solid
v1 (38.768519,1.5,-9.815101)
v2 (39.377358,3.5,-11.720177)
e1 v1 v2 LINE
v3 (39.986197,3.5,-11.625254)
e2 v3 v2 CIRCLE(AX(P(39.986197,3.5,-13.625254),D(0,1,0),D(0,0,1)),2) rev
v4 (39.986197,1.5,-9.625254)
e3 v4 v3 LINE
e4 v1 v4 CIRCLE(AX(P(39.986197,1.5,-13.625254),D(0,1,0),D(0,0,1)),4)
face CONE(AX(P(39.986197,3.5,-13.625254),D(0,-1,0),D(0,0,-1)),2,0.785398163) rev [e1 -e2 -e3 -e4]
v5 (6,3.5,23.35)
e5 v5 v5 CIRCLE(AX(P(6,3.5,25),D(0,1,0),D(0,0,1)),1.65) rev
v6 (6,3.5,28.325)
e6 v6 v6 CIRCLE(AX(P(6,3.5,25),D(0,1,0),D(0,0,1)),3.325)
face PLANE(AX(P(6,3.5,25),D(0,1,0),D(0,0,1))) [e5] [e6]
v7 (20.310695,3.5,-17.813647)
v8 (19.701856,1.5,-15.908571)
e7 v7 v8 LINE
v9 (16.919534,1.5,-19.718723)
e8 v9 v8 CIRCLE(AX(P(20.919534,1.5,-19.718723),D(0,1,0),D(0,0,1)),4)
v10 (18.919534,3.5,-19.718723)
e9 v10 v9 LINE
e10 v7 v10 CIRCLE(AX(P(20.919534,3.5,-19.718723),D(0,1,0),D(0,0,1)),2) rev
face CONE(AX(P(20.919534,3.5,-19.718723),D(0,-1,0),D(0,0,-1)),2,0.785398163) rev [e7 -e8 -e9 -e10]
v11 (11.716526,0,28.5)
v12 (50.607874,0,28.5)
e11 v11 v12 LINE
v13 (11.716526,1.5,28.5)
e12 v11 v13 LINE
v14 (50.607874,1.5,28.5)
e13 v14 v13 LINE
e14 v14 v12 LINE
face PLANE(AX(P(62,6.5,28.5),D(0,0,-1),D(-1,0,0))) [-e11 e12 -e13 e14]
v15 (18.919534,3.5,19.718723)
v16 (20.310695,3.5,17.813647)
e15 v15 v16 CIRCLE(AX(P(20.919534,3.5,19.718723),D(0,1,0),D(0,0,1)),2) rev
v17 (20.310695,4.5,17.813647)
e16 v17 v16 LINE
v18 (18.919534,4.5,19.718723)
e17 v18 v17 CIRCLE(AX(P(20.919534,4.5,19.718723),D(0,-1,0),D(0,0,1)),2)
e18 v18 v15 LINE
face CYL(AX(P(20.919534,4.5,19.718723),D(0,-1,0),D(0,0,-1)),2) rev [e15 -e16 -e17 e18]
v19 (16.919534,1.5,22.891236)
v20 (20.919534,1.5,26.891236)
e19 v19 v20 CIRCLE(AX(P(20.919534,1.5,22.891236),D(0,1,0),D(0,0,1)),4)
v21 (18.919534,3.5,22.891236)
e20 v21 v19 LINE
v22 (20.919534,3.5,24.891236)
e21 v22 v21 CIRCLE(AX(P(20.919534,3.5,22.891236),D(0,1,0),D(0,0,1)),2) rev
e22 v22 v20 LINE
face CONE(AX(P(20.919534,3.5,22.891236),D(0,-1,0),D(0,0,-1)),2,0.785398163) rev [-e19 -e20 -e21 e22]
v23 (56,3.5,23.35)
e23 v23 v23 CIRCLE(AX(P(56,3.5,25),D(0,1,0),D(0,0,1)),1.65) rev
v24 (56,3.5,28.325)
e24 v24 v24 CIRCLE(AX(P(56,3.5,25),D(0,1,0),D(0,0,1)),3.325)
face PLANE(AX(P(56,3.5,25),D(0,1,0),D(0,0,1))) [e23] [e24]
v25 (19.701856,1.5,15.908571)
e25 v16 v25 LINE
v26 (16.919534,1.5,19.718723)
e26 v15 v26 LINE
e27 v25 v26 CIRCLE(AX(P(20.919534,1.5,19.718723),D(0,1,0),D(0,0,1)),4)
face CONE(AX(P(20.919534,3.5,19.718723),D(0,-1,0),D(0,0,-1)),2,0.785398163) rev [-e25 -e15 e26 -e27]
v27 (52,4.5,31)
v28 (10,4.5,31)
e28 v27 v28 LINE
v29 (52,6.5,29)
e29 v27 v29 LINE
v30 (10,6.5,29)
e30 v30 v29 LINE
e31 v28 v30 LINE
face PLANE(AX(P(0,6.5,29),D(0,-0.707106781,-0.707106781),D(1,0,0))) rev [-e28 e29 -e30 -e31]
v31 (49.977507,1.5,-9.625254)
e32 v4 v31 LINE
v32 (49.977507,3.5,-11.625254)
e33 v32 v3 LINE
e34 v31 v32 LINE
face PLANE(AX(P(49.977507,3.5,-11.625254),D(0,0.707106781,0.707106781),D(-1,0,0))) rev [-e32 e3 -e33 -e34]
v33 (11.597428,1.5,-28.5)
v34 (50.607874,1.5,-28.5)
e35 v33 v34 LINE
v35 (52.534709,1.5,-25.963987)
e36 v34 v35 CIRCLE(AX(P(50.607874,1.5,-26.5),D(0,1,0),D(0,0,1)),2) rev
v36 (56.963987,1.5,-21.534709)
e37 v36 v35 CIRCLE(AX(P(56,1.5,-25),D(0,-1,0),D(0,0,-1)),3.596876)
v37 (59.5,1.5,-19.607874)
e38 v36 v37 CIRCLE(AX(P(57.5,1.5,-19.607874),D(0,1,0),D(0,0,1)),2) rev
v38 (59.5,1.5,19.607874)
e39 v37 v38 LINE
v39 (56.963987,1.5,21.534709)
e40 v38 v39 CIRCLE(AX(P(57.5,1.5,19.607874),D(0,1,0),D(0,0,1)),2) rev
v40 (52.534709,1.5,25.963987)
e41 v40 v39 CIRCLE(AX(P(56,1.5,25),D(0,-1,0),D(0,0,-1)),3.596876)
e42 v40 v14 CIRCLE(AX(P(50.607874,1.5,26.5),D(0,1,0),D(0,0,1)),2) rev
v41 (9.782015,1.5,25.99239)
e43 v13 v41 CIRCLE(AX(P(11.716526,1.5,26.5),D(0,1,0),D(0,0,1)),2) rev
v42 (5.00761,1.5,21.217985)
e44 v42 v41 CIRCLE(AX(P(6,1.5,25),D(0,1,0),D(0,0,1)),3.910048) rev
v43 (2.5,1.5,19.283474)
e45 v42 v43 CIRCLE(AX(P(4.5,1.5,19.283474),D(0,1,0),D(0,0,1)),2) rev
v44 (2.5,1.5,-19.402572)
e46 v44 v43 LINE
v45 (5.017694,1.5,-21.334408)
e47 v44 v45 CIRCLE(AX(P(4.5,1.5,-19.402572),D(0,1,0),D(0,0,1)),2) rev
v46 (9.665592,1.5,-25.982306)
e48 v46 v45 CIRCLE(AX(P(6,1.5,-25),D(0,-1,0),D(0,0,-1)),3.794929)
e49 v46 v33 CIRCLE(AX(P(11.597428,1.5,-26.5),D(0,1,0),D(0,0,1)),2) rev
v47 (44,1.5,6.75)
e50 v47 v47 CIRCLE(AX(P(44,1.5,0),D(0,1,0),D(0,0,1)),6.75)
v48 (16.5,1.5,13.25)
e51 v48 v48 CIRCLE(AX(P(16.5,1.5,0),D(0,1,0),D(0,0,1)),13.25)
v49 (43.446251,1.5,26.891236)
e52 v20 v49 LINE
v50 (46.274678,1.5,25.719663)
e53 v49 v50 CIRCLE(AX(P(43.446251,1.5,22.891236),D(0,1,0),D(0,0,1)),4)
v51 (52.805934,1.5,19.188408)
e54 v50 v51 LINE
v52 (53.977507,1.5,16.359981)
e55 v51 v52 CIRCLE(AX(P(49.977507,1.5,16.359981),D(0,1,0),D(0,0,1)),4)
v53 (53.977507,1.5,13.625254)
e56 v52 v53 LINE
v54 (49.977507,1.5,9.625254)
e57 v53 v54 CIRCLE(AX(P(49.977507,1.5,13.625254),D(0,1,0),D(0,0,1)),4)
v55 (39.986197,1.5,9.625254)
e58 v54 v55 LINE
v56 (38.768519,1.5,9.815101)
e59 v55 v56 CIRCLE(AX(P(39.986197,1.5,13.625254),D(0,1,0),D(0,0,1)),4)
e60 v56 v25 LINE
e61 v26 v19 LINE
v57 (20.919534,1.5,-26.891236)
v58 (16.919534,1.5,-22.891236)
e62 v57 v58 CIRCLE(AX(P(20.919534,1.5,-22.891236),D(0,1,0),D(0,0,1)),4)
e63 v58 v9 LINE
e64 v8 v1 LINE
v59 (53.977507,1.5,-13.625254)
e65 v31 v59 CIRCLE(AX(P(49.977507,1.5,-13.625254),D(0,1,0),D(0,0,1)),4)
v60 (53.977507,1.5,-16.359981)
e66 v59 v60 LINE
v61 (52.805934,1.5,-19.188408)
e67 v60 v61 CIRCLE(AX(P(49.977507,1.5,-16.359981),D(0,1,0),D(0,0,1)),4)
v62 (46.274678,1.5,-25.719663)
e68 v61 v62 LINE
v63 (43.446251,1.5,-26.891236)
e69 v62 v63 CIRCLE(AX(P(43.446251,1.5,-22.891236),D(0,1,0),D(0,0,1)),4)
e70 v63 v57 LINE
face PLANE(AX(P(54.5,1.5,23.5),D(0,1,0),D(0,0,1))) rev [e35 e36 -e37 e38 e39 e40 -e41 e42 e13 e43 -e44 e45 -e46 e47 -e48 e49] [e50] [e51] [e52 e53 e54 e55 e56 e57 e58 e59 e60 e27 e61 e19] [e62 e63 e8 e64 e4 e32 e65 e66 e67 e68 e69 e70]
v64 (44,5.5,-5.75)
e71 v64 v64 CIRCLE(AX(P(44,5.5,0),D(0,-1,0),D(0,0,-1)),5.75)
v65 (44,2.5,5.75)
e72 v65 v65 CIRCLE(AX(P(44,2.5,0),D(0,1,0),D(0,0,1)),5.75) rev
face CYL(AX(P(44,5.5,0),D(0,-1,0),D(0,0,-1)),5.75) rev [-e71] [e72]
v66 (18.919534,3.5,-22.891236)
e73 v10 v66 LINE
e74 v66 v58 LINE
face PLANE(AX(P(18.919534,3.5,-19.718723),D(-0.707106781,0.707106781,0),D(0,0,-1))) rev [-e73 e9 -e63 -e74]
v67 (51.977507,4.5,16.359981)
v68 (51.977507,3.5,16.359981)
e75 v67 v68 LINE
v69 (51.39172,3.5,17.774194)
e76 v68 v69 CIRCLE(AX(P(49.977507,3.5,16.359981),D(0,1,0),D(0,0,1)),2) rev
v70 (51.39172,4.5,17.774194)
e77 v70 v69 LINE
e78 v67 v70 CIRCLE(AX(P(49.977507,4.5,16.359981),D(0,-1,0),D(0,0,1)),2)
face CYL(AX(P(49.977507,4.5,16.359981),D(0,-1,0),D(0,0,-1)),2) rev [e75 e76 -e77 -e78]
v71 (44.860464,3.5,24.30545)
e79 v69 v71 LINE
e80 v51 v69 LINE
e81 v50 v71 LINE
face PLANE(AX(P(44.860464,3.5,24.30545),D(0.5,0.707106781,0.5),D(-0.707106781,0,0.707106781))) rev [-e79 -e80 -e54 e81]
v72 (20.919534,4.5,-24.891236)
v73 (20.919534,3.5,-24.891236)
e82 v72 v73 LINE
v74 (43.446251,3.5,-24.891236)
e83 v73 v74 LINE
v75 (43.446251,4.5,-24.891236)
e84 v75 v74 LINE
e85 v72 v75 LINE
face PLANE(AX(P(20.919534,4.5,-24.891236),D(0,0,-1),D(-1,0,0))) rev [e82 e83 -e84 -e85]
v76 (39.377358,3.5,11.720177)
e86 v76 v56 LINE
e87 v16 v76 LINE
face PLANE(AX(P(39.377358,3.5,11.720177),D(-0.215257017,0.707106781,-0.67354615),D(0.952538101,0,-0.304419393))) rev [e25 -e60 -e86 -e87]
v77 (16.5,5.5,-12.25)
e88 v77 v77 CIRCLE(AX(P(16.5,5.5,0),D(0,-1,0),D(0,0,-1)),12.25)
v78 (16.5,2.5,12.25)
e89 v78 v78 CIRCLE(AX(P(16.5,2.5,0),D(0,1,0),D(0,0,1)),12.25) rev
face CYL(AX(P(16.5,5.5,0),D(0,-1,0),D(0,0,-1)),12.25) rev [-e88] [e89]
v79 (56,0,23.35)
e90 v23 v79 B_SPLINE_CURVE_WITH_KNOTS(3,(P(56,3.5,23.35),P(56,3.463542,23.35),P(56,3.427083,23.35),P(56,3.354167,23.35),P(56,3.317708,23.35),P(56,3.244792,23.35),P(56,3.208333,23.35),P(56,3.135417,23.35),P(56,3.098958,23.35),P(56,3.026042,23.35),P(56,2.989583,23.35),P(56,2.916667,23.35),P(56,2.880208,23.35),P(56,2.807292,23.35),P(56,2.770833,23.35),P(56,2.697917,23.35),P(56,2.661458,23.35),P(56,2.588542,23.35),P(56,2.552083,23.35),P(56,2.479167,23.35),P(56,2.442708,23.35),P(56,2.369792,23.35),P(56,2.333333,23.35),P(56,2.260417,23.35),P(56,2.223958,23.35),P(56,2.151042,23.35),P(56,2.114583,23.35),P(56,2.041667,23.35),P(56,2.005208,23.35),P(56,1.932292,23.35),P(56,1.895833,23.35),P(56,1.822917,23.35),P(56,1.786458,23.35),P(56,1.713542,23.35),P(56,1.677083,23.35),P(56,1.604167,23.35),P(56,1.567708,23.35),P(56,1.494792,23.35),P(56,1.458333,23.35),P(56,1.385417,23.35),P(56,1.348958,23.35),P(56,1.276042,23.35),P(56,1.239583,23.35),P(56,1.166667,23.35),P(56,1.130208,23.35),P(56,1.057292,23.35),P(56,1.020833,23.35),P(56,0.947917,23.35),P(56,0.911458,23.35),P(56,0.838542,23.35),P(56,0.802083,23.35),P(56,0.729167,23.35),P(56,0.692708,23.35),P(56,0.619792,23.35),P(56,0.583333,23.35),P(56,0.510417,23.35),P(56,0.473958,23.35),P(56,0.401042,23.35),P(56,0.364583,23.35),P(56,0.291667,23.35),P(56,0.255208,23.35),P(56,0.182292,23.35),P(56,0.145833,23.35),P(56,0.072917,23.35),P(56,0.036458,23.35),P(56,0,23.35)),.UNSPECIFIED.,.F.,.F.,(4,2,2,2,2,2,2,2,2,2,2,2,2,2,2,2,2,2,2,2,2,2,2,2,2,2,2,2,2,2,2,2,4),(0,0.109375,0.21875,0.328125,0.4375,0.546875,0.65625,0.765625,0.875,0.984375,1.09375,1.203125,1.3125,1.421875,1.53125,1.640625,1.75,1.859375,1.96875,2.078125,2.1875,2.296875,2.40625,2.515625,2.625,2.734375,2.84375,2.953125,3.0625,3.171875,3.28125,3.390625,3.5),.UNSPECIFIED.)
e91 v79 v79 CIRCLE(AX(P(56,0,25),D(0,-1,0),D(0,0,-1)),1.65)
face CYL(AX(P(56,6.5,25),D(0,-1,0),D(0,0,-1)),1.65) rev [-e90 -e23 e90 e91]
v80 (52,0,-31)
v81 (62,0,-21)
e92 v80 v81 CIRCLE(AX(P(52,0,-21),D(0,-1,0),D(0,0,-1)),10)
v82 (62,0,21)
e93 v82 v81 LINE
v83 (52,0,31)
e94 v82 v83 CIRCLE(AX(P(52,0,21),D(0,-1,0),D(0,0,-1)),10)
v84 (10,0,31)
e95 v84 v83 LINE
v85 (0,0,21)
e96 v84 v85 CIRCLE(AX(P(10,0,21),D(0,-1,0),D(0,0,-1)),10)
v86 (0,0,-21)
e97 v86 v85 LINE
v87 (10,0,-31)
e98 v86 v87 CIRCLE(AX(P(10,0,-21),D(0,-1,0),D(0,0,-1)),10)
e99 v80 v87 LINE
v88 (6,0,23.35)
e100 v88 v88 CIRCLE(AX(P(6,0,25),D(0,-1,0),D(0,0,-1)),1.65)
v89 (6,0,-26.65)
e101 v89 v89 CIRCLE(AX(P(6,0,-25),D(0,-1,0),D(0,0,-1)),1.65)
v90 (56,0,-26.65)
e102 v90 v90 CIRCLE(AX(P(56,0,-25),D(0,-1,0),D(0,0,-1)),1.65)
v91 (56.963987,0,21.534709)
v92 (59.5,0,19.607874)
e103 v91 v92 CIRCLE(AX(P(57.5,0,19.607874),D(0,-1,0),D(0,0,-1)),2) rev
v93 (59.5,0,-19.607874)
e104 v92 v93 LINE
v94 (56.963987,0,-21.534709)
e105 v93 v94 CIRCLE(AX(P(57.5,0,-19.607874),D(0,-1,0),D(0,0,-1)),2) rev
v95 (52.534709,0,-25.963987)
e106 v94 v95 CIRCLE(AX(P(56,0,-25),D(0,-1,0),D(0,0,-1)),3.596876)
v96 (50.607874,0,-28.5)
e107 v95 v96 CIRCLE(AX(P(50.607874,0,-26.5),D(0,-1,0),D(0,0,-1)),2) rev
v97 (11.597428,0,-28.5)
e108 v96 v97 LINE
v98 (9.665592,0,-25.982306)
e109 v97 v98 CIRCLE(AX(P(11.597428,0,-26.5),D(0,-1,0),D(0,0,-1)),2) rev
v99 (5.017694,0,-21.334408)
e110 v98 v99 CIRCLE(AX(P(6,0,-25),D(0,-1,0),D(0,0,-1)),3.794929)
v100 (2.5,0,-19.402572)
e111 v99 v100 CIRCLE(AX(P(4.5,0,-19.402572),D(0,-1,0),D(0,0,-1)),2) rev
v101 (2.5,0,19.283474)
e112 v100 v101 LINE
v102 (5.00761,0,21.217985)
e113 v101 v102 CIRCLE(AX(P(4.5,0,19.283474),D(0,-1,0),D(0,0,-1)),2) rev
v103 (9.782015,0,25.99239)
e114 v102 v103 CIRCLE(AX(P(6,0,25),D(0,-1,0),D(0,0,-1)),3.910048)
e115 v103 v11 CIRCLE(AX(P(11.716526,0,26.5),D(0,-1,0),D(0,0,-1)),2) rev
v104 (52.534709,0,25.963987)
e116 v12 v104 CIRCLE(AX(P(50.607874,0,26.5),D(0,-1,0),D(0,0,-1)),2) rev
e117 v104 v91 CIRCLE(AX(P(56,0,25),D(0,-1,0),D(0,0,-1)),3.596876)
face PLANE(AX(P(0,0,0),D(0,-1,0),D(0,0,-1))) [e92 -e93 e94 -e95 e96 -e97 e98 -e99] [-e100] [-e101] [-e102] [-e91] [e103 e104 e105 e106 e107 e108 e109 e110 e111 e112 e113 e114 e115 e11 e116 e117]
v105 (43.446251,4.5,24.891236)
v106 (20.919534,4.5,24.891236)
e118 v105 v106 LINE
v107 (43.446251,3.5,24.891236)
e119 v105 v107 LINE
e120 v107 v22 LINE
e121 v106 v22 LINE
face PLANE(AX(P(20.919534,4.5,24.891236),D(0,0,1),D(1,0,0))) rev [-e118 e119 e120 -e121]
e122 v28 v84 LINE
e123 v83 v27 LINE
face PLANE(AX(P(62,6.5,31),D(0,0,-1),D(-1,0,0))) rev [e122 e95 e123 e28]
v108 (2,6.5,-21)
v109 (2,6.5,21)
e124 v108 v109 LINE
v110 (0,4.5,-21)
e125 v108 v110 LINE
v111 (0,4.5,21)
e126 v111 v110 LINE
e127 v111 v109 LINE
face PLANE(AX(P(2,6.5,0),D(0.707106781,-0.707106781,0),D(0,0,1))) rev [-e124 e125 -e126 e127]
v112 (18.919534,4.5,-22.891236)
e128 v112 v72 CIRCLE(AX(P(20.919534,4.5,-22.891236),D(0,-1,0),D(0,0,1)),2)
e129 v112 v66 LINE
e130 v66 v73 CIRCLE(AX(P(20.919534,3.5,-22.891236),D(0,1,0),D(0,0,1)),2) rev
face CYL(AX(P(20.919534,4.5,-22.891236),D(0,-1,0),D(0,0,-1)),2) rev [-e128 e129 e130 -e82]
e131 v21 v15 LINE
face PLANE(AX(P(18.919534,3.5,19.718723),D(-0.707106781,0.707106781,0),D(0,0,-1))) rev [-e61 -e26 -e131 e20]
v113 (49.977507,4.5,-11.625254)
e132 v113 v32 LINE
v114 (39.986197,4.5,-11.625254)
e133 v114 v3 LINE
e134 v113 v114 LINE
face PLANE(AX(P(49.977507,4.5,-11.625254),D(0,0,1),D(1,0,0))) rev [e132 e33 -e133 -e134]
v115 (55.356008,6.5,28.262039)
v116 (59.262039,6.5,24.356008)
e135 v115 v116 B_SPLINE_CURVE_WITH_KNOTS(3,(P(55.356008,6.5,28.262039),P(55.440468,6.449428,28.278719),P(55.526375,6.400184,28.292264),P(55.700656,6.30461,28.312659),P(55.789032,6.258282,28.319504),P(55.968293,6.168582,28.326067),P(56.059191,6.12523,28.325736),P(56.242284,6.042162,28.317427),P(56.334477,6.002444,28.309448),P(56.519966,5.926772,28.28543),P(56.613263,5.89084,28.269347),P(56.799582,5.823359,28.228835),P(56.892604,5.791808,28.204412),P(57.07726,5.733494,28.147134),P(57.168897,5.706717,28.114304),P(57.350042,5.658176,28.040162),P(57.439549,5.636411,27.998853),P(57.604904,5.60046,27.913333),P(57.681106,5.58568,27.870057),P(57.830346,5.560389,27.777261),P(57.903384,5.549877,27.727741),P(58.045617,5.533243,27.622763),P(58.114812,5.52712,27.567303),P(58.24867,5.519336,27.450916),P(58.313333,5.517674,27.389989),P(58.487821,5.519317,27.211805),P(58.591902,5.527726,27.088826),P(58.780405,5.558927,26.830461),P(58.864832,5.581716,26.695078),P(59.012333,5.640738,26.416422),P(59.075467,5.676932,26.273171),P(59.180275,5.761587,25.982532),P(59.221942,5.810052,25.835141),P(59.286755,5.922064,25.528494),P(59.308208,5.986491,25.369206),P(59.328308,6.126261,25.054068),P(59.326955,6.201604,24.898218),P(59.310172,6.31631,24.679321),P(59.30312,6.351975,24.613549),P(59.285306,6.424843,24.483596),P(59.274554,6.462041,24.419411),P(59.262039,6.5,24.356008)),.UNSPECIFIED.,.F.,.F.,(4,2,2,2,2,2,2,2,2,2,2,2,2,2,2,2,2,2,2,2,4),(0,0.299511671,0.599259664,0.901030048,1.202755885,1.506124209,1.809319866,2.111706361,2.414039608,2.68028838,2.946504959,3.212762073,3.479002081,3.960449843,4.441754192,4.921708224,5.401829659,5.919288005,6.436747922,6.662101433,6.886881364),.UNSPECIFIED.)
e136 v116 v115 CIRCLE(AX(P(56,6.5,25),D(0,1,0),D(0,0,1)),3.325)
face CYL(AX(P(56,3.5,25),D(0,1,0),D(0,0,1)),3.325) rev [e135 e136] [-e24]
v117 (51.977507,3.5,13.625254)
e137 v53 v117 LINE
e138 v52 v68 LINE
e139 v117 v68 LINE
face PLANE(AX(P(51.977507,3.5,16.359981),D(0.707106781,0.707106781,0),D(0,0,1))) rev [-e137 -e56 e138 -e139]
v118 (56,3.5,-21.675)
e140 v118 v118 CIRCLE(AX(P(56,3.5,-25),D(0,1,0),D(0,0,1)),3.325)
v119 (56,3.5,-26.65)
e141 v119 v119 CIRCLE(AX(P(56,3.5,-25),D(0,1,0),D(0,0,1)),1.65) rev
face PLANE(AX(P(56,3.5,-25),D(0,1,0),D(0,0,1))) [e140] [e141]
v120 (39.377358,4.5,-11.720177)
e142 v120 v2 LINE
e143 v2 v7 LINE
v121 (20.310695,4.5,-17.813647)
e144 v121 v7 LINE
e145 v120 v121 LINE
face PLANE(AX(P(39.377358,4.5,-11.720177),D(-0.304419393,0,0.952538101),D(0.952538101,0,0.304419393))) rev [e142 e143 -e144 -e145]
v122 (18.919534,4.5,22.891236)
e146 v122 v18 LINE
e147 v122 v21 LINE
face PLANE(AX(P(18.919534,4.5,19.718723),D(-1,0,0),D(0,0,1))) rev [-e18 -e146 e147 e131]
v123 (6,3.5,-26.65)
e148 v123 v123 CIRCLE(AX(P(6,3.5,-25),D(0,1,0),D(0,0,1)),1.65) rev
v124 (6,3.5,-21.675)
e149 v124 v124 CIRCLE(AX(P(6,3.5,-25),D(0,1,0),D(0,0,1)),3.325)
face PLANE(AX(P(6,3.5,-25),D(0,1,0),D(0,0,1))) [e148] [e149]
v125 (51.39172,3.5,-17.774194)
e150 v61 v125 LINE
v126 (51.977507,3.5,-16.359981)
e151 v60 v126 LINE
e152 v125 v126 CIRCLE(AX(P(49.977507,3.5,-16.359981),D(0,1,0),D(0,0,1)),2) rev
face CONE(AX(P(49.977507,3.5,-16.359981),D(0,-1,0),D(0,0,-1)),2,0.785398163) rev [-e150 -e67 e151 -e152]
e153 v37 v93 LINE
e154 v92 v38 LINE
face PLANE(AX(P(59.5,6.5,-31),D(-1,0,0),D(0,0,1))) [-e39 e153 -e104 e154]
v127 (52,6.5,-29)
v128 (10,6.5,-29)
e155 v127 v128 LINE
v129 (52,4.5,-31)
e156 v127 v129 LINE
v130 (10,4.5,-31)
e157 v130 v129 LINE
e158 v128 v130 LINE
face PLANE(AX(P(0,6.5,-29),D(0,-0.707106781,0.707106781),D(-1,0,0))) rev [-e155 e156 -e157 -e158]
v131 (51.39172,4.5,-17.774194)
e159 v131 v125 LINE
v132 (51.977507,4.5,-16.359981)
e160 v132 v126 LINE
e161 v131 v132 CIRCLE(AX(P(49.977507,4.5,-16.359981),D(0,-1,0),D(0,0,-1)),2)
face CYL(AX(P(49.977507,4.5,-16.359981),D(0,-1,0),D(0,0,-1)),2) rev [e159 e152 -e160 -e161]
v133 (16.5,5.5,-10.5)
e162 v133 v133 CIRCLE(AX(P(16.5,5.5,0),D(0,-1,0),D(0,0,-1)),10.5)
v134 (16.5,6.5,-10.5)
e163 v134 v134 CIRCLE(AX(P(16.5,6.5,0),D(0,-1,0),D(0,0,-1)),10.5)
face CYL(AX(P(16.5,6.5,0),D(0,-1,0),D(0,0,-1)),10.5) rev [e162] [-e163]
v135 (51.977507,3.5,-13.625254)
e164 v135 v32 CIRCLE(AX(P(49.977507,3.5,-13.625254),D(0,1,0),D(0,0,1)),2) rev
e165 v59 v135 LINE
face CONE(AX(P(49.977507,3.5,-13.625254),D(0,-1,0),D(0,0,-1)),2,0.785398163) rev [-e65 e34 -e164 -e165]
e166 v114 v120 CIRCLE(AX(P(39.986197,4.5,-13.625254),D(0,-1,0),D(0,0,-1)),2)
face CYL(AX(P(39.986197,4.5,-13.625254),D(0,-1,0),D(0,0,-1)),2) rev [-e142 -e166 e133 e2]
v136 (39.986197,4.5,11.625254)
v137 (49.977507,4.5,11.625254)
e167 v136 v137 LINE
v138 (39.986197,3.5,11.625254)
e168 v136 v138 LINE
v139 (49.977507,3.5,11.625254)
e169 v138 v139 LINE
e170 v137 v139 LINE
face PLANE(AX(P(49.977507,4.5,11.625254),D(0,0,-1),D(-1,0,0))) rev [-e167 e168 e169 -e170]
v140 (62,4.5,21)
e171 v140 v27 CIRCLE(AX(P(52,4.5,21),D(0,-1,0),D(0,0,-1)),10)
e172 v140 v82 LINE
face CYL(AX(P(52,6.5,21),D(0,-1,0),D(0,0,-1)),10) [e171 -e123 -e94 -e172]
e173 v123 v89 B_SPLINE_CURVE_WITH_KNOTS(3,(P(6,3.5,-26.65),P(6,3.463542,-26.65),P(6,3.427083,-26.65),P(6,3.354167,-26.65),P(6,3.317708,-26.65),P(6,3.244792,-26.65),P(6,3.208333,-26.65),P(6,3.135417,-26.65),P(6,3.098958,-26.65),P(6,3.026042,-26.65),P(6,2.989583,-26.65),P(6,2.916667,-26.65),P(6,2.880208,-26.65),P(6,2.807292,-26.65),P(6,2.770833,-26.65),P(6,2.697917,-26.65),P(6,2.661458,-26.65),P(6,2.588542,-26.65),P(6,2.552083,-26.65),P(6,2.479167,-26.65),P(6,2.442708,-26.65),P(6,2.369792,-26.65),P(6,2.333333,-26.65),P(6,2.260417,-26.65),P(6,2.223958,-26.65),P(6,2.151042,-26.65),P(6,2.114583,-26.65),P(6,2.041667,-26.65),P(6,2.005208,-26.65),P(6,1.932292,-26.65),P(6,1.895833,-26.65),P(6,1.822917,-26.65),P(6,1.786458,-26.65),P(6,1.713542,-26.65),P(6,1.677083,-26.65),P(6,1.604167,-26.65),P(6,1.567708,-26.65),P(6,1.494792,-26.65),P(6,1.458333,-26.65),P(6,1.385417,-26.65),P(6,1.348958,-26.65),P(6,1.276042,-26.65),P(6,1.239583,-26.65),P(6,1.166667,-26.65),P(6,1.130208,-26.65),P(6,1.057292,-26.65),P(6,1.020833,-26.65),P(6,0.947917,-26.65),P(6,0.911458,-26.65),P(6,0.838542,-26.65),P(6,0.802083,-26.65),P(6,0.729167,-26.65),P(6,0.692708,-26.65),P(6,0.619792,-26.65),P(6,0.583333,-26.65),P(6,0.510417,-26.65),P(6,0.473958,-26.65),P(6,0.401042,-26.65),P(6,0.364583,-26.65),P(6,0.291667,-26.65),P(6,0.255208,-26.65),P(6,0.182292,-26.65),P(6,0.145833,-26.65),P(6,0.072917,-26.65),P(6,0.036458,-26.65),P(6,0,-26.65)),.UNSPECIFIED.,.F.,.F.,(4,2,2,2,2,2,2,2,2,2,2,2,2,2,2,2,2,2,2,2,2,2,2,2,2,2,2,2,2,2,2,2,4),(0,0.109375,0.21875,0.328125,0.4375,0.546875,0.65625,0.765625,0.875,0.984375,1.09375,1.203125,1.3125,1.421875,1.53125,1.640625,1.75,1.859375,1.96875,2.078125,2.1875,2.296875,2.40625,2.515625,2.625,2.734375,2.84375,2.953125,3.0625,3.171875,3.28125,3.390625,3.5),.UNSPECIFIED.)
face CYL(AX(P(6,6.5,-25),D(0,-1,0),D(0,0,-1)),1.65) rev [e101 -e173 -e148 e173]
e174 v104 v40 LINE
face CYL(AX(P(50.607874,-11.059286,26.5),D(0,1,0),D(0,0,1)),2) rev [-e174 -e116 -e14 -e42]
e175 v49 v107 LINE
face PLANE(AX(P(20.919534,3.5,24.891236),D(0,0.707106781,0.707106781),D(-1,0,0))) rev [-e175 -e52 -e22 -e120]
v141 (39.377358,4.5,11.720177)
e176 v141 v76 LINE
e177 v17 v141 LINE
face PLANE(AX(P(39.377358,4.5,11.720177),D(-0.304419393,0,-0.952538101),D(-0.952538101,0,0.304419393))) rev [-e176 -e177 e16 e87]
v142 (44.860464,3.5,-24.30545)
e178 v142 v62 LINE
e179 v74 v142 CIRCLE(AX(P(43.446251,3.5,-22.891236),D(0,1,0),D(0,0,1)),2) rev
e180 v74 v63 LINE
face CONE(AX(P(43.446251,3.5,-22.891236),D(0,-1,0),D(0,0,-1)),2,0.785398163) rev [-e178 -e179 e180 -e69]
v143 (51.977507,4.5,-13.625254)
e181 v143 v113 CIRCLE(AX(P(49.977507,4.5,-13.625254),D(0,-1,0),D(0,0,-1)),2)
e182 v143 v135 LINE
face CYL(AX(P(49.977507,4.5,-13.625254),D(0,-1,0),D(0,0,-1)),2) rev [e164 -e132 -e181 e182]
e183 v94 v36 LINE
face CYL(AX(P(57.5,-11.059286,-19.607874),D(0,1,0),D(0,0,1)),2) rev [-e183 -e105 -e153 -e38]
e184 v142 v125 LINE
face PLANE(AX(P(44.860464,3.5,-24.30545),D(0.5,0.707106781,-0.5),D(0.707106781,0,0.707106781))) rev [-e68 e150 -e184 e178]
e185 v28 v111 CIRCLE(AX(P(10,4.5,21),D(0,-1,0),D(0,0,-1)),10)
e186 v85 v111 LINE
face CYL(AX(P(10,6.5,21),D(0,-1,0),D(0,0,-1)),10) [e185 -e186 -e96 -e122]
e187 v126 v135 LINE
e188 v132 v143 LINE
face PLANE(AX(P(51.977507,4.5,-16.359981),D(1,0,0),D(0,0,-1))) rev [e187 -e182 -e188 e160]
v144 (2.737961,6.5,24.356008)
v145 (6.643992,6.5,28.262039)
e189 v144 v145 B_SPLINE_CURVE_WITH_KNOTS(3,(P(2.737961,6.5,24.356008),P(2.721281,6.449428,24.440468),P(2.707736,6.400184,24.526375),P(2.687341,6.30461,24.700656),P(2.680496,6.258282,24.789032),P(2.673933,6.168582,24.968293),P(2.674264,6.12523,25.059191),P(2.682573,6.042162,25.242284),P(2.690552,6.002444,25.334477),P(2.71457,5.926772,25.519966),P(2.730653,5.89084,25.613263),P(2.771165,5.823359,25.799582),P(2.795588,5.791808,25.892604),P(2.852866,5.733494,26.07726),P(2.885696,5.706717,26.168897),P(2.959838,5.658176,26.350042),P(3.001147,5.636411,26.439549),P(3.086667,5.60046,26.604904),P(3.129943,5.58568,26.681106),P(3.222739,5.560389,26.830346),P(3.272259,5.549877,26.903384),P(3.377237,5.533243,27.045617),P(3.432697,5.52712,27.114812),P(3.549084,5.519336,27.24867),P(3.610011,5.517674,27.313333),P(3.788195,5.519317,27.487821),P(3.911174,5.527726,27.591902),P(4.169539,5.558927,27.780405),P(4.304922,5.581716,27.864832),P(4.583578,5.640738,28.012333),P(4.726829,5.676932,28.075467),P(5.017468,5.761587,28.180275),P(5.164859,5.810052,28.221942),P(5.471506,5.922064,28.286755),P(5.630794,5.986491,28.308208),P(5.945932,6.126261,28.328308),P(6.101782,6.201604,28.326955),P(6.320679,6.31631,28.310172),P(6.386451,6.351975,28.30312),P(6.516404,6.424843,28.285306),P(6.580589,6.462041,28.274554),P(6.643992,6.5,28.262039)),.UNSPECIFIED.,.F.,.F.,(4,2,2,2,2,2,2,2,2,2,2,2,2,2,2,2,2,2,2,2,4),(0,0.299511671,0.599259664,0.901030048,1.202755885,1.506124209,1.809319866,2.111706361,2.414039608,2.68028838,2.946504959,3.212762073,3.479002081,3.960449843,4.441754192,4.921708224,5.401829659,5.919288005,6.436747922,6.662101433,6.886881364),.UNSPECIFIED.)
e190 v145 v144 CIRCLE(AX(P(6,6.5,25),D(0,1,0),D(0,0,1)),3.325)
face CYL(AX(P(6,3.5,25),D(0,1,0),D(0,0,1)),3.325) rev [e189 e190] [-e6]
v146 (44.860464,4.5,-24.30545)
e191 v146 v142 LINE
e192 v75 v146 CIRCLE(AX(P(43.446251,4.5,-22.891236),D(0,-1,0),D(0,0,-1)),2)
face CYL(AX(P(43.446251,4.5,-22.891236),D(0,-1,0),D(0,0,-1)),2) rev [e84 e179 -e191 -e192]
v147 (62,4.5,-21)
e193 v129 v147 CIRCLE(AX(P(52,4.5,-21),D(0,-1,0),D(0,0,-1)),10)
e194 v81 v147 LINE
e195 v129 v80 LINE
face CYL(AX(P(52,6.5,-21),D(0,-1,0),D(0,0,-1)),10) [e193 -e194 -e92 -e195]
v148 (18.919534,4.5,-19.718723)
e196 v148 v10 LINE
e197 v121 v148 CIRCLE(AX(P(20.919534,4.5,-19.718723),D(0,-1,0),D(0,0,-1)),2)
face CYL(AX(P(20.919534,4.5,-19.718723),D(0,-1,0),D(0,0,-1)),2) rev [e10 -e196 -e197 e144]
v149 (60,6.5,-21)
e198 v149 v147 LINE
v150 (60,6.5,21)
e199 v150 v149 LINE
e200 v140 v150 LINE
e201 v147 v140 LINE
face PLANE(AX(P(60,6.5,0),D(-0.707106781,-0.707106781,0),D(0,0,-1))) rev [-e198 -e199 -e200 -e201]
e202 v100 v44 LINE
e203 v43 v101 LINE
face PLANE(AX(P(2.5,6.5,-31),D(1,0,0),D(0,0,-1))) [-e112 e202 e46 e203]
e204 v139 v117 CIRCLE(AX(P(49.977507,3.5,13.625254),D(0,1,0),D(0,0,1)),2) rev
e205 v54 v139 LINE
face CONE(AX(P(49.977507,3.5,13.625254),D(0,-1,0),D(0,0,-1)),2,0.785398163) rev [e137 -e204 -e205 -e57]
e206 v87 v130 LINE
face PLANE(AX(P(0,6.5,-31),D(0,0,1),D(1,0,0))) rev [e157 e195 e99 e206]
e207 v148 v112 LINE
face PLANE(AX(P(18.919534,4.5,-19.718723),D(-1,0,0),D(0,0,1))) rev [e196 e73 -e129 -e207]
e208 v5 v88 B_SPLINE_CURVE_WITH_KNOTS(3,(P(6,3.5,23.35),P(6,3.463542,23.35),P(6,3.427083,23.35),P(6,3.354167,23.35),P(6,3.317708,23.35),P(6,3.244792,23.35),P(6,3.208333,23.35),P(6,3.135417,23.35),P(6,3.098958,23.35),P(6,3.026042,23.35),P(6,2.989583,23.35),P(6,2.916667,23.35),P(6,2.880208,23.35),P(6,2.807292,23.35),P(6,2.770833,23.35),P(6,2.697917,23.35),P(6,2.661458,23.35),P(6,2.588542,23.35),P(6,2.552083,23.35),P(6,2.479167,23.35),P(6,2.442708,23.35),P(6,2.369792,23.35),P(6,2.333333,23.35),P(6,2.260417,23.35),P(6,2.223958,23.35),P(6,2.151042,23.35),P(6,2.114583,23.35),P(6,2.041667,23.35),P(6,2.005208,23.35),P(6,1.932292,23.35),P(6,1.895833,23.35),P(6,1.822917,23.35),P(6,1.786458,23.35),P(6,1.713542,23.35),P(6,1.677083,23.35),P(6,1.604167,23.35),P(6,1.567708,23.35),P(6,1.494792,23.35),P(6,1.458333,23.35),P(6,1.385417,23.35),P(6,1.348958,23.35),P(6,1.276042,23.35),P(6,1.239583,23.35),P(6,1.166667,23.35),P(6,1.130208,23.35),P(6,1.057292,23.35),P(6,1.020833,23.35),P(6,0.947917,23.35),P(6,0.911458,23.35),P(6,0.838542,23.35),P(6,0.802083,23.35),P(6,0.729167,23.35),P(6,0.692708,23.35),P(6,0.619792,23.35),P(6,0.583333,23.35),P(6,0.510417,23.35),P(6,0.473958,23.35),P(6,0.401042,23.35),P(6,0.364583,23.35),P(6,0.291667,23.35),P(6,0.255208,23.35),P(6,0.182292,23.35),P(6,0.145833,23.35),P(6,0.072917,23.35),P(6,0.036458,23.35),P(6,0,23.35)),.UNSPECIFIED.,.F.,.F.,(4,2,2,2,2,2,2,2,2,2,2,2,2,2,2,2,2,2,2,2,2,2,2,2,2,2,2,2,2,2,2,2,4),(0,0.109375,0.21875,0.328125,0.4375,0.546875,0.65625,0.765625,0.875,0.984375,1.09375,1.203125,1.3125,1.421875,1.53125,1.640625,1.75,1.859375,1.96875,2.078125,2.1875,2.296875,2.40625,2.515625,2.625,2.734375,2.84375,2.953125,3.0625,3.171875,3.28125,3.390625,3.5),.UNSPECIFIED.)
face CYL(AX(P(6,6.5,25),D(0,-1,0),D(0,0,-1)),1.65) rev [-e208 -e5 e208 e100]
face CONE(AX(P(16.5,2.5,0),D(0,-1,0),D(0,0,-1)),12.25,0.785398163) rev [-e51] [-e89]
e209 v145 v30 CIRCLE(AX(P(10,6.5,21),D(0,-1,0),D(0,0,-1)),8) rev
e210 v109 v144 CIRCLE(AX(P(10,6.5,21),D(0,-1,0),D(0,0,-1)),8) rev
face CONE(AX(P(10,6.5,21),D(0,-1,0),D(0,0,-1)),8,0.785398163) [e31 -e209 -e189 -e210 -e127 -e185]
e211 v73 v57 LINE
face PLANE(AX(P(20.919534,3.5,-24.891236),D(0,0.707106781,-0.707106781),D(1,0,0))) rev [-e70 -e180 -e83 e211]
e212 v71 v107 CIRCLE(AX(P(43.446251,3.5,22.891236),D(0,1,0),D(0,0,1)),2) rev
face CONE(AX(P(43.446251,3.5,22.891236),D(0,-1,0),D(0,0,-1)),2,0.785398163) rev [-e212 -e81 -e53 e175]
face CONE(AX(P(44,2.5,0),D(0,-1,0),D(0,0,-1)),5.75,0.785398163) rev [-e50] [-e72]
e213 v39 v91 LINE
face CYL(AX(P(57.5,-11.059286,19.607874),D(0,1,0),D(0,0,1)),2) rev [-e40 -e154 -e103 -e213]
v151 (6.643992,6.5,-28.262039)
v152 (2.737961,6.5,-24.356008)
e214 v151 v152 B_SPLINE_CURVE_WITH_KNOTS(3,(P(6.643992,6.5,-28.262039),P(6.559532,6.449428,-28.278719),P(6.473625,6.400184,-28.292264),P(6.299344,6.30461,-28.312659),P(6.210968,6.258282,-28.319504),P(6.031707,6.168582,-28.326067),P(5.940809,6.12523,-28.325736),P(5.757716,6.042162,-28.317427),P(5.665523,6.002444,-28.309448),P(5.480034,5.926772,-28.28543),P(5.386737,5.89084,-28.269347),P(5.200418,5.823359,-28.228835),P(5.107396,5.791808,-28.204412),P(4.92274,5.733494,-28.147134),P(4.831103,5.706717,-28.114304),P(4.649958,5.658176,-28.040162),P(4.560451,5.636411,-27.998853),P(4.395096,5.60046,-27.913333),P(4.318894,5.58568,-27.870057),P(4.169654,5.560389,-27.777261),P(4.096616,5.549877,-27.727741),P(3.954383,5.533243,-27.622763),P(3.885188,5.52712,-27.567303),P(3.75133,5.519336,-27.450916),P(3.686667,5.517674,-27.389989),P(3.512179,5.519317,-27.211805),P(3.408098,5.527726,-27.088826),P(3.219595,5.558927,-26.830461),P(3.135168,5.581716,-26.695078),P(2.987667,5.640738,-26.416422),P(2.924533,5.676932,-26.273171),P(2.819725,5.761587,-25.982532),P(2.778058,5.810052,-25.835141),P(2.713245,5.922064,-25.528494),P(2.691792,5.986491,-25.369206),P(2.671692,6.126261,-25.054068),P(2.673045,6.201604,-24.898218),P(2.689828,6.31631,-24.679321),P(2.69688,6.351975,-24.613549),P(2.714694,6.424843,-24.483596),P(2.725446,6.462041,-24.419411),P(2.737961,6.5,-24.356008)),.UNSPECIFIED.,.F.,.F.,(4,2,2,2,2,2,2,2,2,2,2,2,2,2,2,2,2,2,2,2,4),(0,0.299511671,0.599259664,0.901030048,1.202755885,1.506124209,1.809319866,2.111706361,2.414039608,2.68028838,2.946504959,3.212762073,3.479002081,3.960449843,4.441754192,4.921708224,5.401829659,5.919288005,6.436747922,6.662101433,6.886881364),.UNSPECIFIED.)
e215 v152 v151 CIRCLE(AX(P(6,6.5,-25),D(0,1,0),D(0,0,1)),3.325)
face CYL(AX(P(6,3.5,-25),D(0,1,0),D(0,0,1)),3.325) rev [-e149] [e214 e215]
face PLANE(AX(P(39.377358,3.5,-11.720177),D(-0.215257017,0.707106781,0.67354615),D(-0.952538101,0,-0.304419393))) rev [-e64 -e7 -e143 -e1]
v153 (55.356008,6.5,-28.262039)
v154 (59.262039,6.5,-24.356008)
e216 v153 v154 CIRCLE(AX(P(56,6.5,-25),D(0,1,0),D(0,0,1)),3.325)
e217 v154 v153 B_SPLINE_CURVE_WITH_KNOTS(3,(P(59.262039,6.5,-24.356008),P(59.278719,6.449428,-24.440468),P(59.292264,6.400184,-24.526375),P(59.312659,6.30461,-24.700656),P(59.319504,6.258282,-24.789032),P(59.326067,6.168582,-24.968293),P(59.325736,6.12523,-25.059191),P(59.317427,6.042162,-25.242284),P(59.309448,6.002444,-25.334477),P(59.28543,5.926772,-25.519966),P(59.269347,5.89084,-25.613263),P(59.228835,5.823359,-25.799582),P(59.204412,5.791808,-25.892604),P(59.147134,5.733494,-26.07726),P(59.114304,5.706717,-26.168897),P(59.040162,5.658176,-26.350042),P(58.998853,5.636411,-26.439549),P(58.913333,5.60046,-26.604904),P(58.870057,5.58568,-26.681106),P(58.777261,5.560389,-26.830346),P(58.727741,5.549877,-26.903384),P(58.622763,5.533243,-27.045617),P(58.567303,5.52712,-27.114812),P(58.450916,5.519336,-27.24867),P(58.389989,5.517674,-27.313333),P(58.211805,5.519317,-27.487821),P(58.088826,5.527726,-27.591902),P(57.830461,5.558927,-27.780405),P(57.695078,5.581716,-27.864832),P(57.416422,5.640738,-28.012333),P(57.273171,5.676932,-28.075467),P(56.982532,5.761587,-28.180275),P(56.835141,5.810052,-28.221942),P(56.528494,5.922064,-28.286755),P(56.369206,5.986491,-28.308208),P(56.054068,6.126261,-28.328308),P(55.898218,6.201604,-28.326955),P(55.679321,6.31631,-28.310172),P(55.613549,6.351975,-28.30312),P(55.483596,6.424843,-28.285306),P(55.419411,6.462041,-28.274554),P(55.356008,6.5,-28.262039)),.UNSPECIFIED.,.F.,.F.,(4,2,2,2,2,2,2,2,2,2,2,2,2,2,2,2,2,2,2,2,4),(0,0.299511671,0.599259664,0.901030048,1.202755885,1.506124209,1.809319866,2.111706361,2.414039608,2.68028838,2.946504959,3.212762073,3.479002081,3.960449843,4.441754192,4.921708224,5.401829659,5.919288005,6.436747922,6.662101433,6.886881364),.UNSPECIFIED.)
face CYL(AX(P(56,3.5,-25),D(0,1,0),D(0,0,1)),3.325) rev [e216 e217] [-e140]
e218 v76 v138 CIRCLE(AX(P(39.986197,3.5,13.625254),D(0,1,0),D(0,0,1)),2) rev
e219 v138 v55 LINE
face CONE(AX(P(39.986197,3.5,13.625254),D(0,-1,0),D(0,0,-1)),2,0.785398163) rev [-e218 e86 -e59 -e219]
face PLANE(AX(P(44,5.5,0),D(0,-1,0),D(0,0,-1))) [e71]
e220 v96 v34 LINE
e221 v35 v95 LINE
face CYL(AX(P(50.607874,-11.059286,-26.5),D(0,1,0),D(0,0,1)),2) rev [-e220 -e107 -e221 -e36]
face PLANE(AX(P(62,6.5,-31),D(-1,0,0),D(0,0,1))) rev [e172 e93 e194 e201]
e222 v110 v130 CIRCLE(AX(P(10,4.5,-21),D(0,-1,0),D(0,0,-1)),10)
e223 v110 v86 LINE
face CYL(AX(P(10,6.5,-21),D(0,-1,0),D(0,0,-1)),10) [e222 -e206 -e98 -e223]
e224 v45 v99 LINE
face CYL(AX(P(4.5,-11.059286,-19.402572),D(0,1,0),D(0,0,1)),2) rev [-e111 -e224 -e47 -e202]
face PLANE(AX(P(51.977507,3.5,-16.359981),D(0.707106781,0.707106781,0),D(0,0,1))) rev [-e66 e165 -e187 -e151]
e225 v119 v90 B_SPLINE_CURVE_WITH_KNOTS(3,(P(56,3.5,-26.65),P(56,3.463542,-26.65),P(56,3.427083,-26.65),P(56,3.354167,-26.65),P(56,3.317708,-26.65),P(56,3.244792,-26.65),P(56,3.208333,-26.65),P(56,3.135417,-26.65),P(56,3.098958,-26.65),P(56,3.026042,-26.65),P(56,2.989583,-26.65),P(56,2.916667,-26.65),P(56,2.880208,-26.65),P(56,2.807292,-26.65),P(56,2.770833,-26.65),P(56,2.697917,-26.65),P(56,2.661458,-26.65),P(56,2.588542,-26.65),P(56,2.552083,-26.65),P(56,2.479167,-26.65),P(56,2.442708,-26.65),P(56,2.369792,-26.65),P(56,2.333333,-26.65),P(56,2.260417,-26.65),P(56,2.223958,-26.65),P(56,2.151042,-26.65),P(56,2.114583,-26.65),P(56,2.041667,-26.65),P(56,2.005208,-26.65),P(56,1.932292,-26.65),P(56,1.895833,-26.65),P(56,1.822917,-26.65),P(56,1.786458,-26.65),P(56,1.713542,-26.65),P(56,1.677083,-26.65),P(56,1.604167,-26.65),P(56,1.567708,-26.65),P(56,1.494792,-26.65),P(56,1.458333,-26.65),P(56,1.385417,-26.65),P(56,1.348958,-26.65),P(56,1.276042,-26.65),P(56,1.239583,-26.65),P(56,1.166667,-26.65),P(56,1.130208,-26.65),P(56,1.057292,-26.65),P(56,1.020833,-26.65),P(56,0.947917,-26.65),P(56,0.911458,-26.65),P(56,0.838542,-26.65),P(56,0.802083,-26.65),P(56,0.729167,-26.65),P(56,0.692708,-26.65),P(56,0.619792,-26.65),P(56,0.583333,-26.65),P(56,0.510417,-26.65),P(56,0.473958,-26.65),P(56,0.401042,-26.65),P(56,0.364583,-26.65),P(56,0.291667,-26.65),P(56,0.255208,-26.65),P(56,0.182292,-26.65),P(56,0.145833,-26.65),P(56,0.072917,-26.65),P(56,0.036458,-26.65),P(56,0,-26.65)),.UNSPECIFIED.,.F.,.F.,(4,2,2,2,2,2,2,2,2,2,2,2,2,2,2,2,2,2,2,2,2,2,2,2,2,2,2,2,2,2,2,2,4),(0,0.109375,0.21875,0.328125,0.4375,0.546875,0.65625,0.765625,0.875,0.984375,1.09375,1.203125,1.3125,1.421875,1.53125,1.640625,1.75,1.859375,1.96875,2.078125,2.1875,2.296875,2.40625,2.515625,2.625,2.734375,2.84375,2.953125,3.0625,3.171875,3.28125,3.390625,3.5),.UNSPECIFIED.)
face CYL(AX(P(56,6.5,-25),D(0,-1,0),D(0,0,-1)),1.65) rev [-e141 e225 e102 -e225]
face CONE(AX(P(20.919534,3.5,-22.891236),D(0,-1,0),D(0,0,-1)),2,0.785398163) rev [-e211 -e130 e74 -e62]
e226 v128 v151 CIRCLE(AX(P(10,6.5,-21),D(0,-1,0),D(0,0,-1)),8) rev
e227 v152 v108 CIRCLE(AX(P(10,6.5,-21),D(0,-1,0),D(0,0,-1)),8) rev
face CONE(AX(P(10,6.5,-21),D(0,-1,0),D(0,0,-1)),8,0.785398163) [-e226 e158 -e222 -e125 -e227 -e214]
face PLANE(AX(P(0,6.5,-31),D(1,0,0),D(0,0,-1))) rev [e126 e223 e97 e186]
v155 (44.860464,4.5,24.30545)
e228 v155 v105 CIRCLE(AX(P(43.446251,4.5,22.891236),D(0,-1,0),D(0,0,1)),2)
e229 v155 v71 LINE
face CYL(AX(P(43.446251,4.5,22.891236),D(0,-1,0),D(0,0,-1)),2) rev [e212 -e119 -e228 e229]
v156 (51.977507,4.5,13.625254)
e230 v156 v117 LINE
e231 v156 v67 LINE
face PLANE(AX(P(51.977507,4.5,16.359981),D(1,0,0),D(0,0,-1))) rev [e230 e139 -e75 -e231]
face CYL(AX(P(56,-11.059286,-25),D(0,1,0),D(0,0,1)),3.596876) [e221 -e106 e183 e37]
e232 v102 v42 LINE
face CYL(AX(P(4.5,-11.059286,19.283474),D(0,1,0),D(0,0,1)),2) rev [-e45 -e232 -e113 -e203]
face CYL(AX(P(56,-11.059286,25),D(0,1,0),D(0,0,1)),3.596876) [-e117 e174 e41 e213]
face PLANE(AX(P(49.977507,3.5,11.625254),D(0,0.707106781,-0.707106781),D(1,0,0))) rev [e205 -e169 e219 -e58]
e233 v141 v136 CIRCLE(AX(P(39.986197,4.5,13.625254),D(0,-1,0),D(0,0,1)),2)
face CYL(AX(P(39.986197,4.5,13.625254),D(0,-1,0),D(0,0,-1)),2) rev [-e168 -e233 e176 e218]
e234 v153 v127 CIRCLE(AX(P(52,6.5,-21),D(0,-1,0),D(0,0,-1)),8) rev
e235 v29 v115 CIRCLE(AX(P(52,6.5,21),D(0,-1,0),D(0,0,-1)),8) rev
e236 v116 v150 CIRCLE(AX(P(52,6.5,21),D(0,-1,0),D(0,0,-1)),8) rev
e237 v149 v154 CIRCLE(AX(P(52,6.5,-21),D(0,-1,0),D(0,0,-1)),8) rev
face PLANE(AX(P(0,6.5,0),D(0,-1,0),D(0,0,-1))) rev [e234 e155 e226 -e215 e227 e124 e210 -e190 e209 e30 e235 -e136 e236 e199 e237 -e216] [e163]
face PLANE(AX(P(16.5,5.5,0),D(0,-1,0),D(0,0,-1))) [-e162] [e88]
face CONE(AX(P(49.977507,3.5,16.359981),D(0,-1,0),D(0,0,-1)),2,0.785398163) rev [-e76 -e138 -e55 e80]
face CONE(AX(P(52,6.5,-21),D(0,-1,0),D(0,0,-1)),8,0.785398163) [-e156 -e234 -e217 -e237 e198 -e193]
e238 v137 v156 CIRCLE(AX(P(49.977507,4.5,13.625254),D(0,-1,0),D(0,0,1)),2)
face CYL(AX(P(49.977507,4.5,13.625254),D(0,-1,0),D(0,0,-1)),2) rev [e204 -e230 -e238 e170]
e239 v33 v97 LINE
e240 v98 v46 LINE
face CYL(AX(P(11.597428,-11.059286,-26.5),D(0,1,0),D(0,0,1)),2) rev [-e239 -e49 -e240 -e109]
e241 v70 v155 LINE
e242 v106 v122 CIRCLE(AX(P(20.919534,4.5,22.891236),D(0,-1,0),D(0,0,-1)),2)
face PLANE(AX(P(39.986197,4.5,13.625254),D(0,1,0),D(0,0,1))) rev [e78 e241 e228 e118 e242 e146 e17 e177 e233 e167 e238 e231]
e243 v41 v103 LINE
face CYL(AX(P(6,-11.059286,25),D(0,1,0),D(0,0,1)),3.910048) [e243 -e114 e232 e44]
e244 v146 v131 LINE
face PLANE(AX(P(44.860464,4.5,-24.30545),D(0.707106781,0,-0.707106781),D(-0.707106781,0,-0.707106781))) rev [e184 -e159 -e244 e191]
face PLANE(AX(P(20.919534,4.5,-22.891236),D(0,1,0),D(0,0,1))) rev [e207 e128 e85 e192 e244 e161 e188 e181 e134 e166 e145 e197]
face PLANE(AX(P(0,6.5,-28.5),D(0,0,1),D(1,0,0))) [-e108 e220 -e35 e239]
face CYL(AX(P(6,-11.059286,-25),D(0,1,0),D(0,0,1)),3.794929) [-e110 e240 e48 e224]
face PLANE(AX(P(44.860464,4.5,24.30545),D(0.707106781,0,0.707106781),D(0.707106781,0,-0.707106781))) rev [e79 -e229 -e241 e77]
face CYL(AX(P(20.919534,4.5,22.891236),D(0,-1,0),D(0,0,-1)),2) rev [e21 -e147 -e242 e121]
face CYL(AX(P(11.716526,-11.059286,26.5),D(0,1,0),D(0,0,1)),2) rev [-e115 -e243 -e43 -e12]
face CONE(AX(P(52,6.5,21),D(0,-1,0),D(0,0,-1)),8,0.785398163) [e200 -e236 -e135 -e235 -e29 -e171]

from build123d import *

# Parameters (mm, degrees)
CROQUIS1_W              = 62
CROQUIS1_H              = 62
SALIENTE_EXTRUIR1_DEPTH = 6.5
REDONDEO1_R             = 10
REDONDEO2_R             = 10
VACIADO1_T              = -2.5
SALIENTE_EXTRUIR2_DEPTH = 5
CROQUIS6_R              = 12.25
CORTAR_EXTRUIR4_DEPTH   = 4
CROQUIS8_R              = 10.5
CORTAR_EXTRUIR7_DEPTH   = 70.535961919
CROQUIS9_R              = 1.65
CORTAR_EXTRUIR8_DEPTH   = 70.622194737
CROQUIS10_R             = 3.325
CORTAR_EXTRUIR9_DEPTH   = 3
SALIENTE_EXTRUIR3_START = 1.5
CROQUIS11_R             = 3.910048181
CROQUIS11_R_2           = 1.65
CROQUIS11_R_3           = 3.794929079
CROQUIS11_R_4           = 3.596875763
SALIENTE_EXTRUIR3_DEPTH = 1.5
REDONDEO3_R             = 2
CHAFL_N1_SIZE           = 1
CHAFL_N2_SIZE           = 2
CROQUIS12_R             = 5.75
CORTAR_EXTRUIR10_DEPTH  = 4
CHAFL_N3_SIZE           = 1
CORTAR_EXTRUIR11_DEPTH  = 3
CHAFL_N4_SIZE           = 2


with BuildPart() as part:
    # Croquis1 → Saliente-Extruir1 (new body)
    with BuildSketch(Plane(origin=(0, 0, 0), x_dir=(1, 0, 0), z_dir=(0, 1, 0))):
        with Locations((31, 0)):
            Rectangle(CROQUIS1_W, CROQUIS1_H)
    extrude(amount=SALIENTE_EXTRUIR1_DEPTH)

    # Redondeo1
    redondeo1_edges = [part.edges().sort_by_distance(p)[0] for p in [
        (62, 3.25, -31),
        (62, 3.25, 31),
    ]]
    fillet(redondeo1_edges, radius=REDONDEO1_R)

    # Redondeo2
    redondeo2_edges = [part.edges().sort_by_distance(p)[0] for p in [
        (0, 3.25, -31),
        (0, 3.25, 31),
    ]]
    fillet(redondeo2_edges, radius=REDONDEO2_R)

    # Vaciado1
    vaciado1_openings = [part.faces().sort_by_distance(p)[0] for p in [
        (31, 6.5, 0),
        (31, 0, 0),
    ]]
    offset(amount=VACIADO1_T, openings=vaciado1_openings, kind=Kind.INTERSECTION)

    # Croquis4 → Saliente-Extruir2 (add)
    with BuildSketch(Plane.XZ.offset(-6.5)):
        with BuildLine():
            Line((7.085748882, 28.5), (54.5, 28.5))
            ThreePointArc((54.5, 28.5), (58.035533906, 27.035533906), (59.5, 23.5))
            Line((59.5, 23.5), (59.5, -23.5))
            ThreePointArc((59.5, -23.5), (58.035533906, -27.035533906), (54.5, -28.5))
            Line((54.5, -28.5), (7.085748882, -28.5))
            ThreePointArc((7.085748882, -28.5), (3.550214976, -27.035533906), (2.085748882, -23.5))
            Line((2.085748882, -23.5), (2.085748882, 23.5))
            ThreePointArc((2.085748882, 23.5), (3.550214976, 27.035533906), (7.085748882, 28.5))
        make_face()
    extrude(amount=SALIENTE_EXTRUIR2_DEPTH)

    # Croquis6 → Cortar-Extruir4 (cut)
    with BuildSketch(Plane(origin=(0, 1.5, 0), x_dir=(-1, 0, 0), z_dir=(0, -1, 0))):
        with Locations(Location((-16.5, 0, 0), (0, 0, 90))):
            Circle(CROQUIS6_R)
    extrude(amount=-CORTAR_EXTRUIR4_DEPTH, mode=Mode.SUBTRACT)

    # Croquis8 → Cortar-Extruir7 (cut, through all)
    with BuildSketch(Plane.XZ.offset(-5.5)):
        with Locations(Location((16.5, 0, 0), (0, 0, 270))):
            Circle(CROQUIS8_R)
    extrude(amount=-CORTAR_EXTRUIR7_DEPTH, mode=Mode.SUBTRACT)

    # Croquis9 → Cortar-Extruir8 (cut, through all)
    with BuildSketch(Plane.XZ):
        with Locations(Location((6, 25, 0), (0, 0, 270))):
            Circle(CROQUIS9_R)
        with Locations(Location((56, 25, 0), (0, 0, 270))):
            Circle(CROQUIS9_R)
        with Locations(Location((56, -25, 0), (0, 0, 270))):
            Circle(CROQUIS9_R)
        with Locations(Location((6, -25, 0), (0, 0, 270))):
            Circle(CROQUIS9_R)
    extrude(amount=-CORTAR_EXTRUIR8_DEPTH, mode=Mode.SUBTRACT)

    # Croquis10 → Cortar-Extruir9 (cut)
    with BuildSketch(Plane(origin=(0, 6.5, 0), x_dir=(1, 0, 0), z_dir=(0, 1, 0))):
        with Locations(Location((6, 25, 0), (0, 0, 270))):
            Circle(CROQUIS10_R)
        with Locations(Location((6, -25, 0), (0, 0, 270))):
            Circle(CROQUIS10_R)
        with Locations(Location((56, -25, 0), (0, 0, 270))):
            Circle(CROQUIS10_R)
        with Locations(Location((56, 25, 0), (0, 0, 270))):
            Circle(CROQUIS10_R)
    extrude(amount=-CORTAR_EXTRUIR9_DEPTH, mode=Mode.SUBTRACT)

    # Croquis11 → Saliente-Extruir3 (add)
    # profile 1 of 4: a face of its own
    with BuildSketch(Plane.XZ.offset(-1.5).offset(SALIENTE_EXTRUIR3_START)):
        with Locations((6, 25)):
            Circle(CROQUIS11_R)
        with Locations(Location((6, 25, 0), (0, 0, 270))):
            Circle(CROQUIS11_R_2, mode=Mode.SUBTRACT)
    # profile 2 of 4: a face of its own
    with BuildSketch(Plane.XZ.offset(-1.5).offset(SALIENTE_EXTRUIR3_START)):
        with Locations((6, -25)):
            Circle(CROQUIS11_R_3)
        with Locations(Location((6, -25, 0), (0, 0, 270))):
            Circle(CROQUIS11_R_2, mode=Mode.SUBTRACT)
    # profile 3 of 4: a face of its own
    with BuildSketch(Plane.XZ.offset(-1.5).offset(SALIENTE_EXTRUIR3_START)):
        with Locations((56, -25)):
            Circle(CROQUIS11_R_4)
        with Locations(Location((56, -25, 0), (0, 0, 270))):
            Circle(CROQUIS11_R_2, mode=Mode.SUBTRACT)
    # profile 4 of 4: a face of its own
    with BuildSketch(Plane.XZ.offset(-1.5).offset(SALIENTE_EXTRUIR3_START)):
        with Locations((56, 25)):
            Circle(CROQUIS11_R_4)
        with Locations(Location((56, 25, 0), (0, 0, 270))):
            Circle(CROQUIS11_R_2, mode=Mode.SUBTRACT)
    extrude(amount=-SALIENTE_EXTRUIR3_DEPTH)

    # Redondeo3
    redondeo3_edges = [part.edges().sort_by_distance(p)[0] for p in [
        (54.263904065, 0.75, 28.150156529),
        (59.150156529, 0.75, 23.263904065),
        (59.150156529, 0.75, -23.263904065),
        (54.263904065, 0.75, -28.150156529),
        (7.996337674, 0.75, -28.227401835),
        (2.772598165, 0.75, -23.003662326),
        (2.732409322, 0.75, 22.852599726),
        (8.147400274, 0.75, 28.267590678),
    ]]
    fillet(redondeo3_edges, radius=REDONDEO3_R)

    # Chaflán1
    chafl_n1_edges = [part.edges().sort_by_distance(p)[0] for p in [
        (16.5, 1.5, 12.25),
    ]]
    chamfer(chafl_n1_edges, length=CHAFL_N1_SIZE)

    # Chaflán2
    # the kernel refuses this chamfer: 2 mm, written as the material it takes off along each edge
    with BuildSketch(Plane(origin=(10, 6.5, -31), x_dir=(0, -0.9996219169112968, -0.027495876610585623), z_dir=(1, 0, 0)), Plane(origin=(62, 6.5, -21), x_dir=(0.027495876610585623, -0.9996219169112968, 0), z_dir=(0, 0, 1)), Plane(origin=(52, 6.5, 31), x_dir=(0, -0.9996219169112968, 0.027495876610585623), z_dir=(-1, 0, 0)), Plane(origin=(0, 6.5, 21), x_dir=(-0.027495876610586365, -0.9996219169112968, 0), z_dir=(0, 0, -1))) as chafl_n2_piece_1:
        Polygon((CHAFL_N2_SIZE * 0.999621916911, -CHAFL_N2_SIZE * 0.0274958766106), (-CHAFL_N2_SIZE * 0.0274958766106, -CHAFL_N2_SIZE * 0.999621916911), (0, 0), align=None)
    extrude(amount=42, mode=Mode.SUBTRACT)
    with BuildSketch(Plane(origin=(52, 6.5, 21), x_dir=(1, 0, 0), z_dir=(0, 0, -1))) as chafl_n2_piece_2:
        Polygon((10, CHAFL_N2_SIZE), (10 - CHAFL_N2_SIZE, 0), (10, 0), align=None)
    revolve(axis=Axis((52, 6.5, 21), (0, -1, 0)), revolution_arc=90, mode=Mode.SUBTRACT)
    with BuildSketch(Plane(origin=(52, 6.5, -21), x_dir=(0, 0, -1), z_dir=(-1, 0, 0))) as chafl_n2_piece_3:
        Polygon((10, CHAFL_N2_SIZE), (10 - CHAFL_N2_SIZE, 0), (10, 0), align=None)
    revolve(axis=Axis((52, 6.5, -21), (0, -1, 0)), revolution_arc=90, mode=Mode.SUBTRACT)
    with BuildSketch(Plane(origin=(10, 6.5, -21), x_dir=(0, 0, -1), z_dir=(1, 0, 0))) as chafl_n2_piece_4:
        Polygon((10, -CHAFL_N2_SIZE), (10 - CHAFL_N2_SIZE, 0), (10, 0), align=None)
    revolve(axis=Axis((10, 6.5, -21), (0, 1, 0)), revolution_arc=90, mode=Mode.SUBTRACT)
    with BuildSketch(Plane(origin=(10, 6.5, 21), x_dir=(-1, 0, 0), z_dir=(0, 0, -1))) as chafl_n2_piece_5:
        Polygon((10, -CHAFL_N2_SIZE), (10 - CHAFL_N2_SIZE, 0), (10, 0), align=None)
    revolve(axis=Axis((10, 6.5, 21), (0, 1, 0)), revolution_arc=90, mode=Mode.SUBTRACT)

    # Croquis12 → Cortar-Extruir10 (cut)
    with BuildSketch(Plane.XZ.offset(-1.5)):
        with Locations(Location((44, 0, 0), (0, 0, 270))):
            Circle(CROQUIS12_R)
    extrude(amount=-CORTAR_EXTRUIR10_DEPTH, mode=Mode.SUBTRACT)

    # Chaflán3
    chafl_n3_edges = [part.edges().sort_by_distance(p)[0] for p in [
        (44, 1.5, 5.75),
    ]]
    chamfer(chafl_n3_edges, length=CHAFL_N3_SIZE)

    # Croquis14 → Cortar-Extruir11 (cut)
    with BuildSketch(Plane.XZ.offset(-1.5)):
        with BuildLine():
            Line((20.919533653, 24.89123626), (43.446250752, 24.89123626))
            ThreePointArc((43.446250752, 24.89123626), (44.211617617, 24.738995325), (44.860464315, 24.305449822))
            Line((44.860464315, 24.305449822), (51.391720064, 17.774194073))
            ThreePointArc((51.391720064, 17.774194073), (51.825265567, 17.125347375), (51.977506502, 16.35998051))
            Line((51.977506502, 16.35998051), (51.977506502, 13.625253628))
            ThreePointArc((51.977506502, 13.625253628), (51.391720064, 12.211040066), (49.977506502, 11.625253628))
            Line((49.977506502, 11.625253628), (39.986196606, 11.625253628))
            ThreePointArc((39.986196606, 11.625253628), (39.678099546, 11.649127063), (39.37735782, 11.720177427))
            Line((39.37735782, 11.720177427), (20.310694867, 17.81364703))
            ThreePointArc((20.310694867, 17.81364703), (19.304343638, 18.539248258), (18.919533653, 19.718723232))
            Line((18.919533653, 19.718723232), (18.919533653, 22.89123626))
            ThreePointArc((18.919533653, 22.89123626), (19.505320091, 24.305449822), (20.919533653, 24.89123626))
        make_face()
        with BuildLine():
            Line((18.919533653, -19.718723232), (18.919533653, -22.89123626))
            ThreePointArc((18.919533653, -22.89123626), (19.505320091, -24.305449822), (20.919533653, -24.89123626))
            Line((20.919533653, -24.89123626), (43.446250752, -24.89123626))
            ThreePointArc((43.446250752, -24.89123626), (44.211617617, -24.738995325), (44.860464315, -24.305449822))
            Line((44.860464315, -24.305449822), (51.391720064, -17.774194073))
            ThreePointArc((51.391720064, -17.774194073), (51.825265567, -17.125347375), (51.977506502, -16.35998051))
            Line((51.977506502, -16.35998051), (51.977506502, -13.625253628))
            ThreePointArc((51.977506502, -13.625253628), (51.391720064, -12.211040066), (49.977506502, -11.625253628))
            Line((49.977506502, -11.625253628), (39.986196606, -11.625253628))
            ThreePointArc((39.986196606, -11.625253628), (39.678099546, -11.649127063), (39.37735782, -11.720177427))
            Line((39.37735782, -11.720177427), (20.310694867, -17.81364703))
            ThreePointArc((20.310694867, -17.81364703), (19.304343638, -18.539248258), (18.919533653, -19.718723232))
        make_face()
    extrude(amount=-CORTAR_EXTRUIR11_DEPTH, mode=Mode.SUBTRACT)

    # Chaflán4
    chafl_n4_edges = [part.edges().sort_by_distance(p)[0] for p in [
        (39.678099546, 1.5, 11.649127063),
        (44.981851554, 1.5, 11.625253628),
        (51.391720064, 1.5, 12.211040066),
        (51.977506502, 1.5, 14.992617069),
        (51.825265567, 1.5, 17.125347375),
        (48.12609219, 1.5, 21.039821948),
        (44.211617617, 1.5, 24.738995325),
        (32.182892203, 1.5, 24.89123626),
        (19.505320091, 1.5, 24.305449822),
        (18.919533653, 1.5, 21.304979746),
        (19.304343638, 1.5, 18.539248258),
        (29.844026344, 1.5, 14.766912229),
        (19.505320091, 1.5, -24.305449822),
        (32.182892203, 1.5, -24.89123626),
        (44.211617617, 1.5, -24.738995325),
        (48.12609219, 1.5, -21.039821948),
        (51.825265567, 1.5, -17.125347375),
        (51.977506502, 1.5, -14.992617069),
        (51.391720064, 1.5, -12.211040066),
        (44.981851554, 1.5, -11.625253628),
        (39.678099546, 1.5, -11.649127063),
        (29.844026344, 1.5, -14.766912229),
        (19.304343638, 1.5, -18.539248258),
        (18.919533653, 1.5, -21.304979746),
    ]]
    chamfer(chafl_n4_edges, length=CHAFL_N4_SIZE)


solid = part.part
